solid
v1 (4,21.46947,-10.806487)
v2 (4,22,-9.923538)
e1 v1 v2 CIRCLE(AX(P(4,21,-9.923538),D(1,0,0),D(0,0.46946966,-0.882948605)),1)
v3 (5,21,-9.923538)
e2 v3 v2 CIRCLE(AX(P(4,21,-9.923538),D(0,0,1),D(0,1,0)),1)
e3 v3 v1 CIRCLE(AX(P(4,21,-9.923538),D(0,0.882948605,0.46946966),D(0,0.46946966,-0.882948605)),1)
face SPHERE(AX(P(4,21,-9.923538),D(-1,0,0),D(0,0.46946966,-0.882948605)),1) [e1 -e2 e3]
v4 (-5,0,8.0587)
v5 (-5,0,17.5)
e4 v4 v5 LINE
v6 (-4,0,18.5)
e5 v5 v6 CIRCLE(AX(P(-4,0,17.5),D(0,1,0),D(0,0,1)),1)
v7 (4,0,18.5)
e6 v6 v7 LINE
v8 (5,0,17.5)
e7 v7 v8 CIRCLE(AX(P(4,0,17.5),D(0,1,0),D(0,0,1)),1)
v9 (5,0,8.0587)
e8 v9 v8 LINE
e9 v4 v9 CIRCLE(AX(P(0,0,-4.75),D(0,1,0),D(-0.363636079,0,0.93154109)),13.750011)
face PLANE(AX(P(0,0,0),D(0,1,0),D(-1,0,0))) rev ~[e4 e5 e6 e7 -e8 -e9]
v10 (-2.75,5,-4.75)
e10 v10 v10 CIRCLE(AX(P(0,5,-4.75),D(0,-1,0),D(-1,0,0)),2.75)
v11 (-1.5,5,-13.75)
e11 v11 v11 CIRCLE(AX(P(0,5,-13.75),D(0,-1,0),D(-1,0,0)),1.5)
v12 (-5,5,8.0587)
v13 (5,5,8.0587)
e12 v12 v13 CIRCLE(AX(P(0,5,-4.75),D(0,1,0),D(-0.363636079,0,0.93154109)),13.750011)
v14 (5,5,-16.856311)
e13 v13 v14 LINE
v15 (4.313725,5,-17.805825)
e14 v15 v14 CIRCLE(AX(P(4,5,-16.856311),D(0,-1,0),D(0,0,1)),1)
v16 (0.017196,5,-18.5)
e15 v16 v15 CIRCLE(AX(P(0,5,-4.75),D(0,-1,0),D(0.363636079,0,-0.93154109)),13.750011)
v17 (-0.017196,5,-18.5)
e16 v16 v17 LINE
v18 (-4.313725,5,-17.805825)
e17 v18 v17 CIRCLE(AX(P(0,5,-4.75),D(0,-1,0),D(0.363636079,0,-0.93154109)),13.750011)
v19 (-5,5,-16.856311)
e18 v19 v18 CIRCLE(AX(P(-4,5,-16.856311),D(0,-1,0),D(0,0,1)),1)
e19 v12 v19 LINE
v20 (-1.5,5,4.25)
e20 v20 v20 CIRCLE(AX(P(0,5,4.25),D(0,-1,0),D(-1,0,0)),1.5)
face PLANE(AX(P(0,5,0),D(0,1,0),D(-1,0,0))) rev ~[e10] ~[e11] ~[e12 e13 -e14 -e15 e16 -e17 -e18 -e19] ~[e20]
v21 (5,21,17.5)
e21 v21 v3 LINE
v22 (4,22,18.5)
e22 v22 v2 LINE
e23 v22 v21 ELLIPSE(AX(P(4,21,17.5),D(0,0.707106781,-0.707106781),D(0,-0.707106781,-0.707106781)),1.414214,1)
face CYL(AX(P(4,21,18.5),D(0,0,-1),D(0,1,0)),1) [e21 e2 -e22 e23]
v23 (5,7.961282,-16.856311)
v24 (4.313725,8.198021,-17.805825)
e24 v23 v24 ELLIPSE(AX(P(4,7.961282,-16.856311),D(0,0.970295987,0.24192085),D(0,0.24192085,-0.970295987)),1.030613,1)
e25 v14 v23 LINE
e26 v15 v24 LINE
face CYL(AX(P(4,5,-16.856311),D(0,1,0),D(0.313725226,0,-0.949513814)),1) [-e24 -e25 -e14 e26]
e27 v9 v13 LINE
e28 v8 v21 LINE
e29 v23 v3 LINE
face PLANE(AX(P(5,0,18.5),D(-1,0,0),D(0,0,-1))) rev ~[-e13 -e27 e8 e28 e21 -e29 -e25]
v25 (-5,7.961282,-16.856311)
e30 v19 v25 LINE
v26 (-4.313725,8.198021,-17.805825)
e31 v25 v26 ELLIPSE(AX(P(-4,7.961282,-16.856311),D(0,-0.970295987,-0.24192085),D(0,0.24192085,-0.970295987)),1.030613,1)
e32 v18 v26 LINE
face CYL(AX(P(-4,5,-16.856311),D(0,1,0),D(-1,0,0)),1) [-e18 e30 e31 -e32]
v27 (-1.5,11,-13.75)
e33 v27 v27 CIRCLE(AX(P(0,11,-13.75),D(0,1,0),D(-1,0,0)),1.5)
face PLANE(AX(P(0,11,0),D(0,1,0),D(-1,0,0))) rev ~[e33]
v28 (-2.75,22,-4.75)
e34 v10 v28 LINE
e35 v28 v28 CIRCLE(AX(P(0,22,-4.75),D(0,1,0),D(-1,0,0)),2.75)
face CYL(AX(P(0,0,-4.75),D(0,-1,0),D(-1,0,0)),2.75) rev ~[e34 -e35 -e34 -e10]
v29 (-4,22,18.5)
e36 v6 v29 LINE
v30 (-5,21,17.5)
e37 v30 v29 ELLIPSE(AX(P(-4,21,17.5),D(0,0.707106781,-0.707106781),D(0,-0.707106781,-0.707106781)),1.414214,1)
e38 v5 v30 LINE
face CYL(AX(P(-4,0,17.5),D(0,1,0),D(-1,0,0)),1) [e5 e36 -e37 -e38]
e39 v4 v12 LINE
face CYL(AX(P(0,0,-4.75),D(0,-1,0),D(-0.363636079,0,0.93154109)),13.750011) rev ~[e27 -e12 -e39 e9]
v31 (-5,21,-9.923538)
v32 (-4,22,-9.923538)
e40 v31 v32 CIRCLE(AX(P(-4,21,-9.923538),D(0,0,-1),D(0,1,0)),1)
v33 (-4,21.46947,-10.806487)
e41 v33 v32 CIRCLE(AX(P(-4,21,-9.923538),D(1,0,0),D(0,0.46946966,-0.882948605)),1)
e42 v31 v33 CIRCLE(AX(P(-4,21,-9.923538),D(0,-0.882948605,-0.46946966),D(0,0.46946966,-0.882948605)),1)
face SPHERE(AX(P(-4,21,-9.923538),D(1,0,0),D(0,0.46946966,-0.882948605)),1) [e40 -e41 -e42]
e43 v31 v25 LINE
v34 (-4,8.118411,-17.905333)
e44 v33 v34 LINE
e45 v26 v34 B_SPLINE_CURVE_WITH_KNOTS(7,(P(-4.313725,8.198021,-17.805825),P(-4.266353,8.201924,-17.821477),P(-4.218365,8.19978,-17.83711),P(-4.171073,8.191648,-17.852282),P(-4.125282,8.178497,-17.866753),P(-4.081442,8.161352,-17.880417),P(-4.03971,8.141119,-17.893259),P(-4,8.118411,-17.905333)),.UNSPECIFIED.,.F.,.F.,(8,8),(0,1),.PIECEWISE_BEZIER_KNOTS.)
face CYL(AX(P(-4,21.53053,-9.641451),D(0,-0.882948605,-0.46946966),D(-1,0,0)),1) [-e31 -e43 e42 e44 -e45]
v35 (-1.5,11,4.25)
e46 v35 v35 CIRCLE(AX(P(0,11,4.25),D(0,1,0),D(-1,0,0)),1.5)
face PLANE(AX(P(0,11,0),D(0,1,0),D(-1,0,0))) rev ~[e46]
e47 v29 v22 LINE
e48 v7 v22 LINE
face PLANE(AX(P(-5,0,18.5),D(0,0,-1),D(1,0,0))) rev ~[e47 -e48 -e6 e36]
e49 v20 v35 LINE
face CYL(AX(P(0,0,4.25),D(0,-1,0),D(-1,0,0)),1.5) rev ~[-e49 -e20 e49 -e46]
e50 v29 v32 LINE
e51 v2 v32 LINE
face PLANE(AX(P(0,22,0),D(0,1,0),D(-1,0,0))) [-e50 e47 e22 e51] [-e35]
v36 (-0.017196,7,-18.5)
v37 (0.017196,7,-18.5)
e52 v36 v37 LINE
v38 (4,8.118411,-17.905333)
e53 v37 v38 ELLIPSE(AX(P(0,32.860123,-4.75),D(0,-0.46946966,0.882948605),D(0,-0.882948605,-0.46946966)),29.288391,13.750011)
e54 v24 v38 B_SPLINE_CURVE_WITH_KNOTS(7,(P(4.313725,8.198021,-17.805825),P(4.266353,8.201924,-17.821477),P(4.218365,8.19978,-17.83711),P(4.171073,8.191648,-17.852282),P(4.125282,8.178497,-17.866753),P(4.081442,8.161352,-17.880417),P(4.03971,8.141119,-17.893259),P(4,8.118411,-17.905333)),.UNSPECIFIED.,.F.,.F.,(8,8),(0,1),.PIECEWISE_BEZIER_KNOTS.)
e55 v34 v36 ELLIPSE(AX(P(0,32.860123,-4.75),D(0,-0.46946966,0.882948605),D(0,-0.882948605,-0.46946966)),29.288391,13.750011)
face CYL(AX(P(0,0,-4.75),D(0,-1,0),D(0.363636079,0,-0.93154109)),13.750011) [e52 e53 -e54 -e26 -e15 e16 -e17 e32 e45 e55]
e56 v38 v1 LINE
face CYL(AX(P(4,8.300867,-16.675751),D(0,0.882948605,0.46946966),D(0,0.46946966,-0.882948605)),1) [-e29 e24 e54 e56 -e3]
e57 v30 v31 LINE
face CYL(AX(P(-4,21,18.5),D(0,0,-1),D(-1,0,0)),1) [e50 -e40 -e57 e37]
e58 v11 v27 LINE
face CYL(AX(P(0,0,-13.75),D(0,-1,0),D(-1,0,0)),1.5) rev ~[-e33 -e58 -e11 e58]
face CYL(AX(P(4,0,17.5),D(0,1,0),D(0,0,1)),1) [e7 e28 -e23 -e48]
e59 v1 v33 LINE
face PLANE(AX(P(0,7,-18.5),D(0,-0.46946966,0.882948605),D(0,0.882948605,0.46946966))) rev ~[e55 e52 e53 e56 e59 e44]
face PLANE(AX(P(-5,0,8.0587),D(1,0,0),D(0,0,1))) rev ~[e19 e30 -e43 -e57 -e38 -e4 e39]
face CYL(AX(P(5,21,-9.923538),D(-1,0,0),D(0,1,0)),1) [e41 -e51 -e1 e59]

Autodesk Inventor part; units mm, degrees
ref_plane "YZ Plane" through (0, 0, 0) normal (1, 0, 0) x (0, 1, 0)
ref_plane "XZ Plane" through (0, 0, 0) normal (0, 1, 0) x (-1, 0, 0)
ref_plane "XY Plane" through (0, 0, 0) normal (0, 0, 1) x (1, 0, 0)
sketch "Skizze1" plane through (0, 0, 0) normal (0, 1, 0) x (-1, 0, 0)
  line L0 (5, 18.5) -> (-5, 18.5)
  line L1 (-5, 18.5) -> (-5, -18.5)
  line L2 (-5, -18.5) -> (5, -18.5)
  line L3 (5, -18.5) -> (5, 18.5)
  line L4 (5, 18.5) -> (-5, -18.5) construction
  line L5 (-5, 18.5) -> (5, -18.5) construction
  circle A0 centre (0, -4.75) radius 13.75 construction
  arc A1 (-5, -17.5587) -> (5, -17.5587) centre (0, -4.75) ccw
  arc A2 (5, 8.0587) -> (-5, 8.0587) centre (0, -4.75) ccw
  line L6 (0, -18.5) -> (0, 9) construction
  circle A3 centre (0, -13.75) radius 1.5
  circle A4 centre (0, 4.25) radius 1.5
  line L7 (-5, -4.75) -> (5, -4.75) construction
  circle A5 centre (0, -13.75) radius 4 construction
  circle A6 centre (0, 4.25) radius 4 construction
  circle A7 centre (0, -4.75) radius 2.75
  point P0 (0, 0)
  point P1 (0, 0)
  dimension "d2" = 37
  dimension "d3" = 10
  dimension "d4" = 27.5
  dimension "d18" = 3
  dimension "d20" = 18
  dimension "d23" = 8
  dimension "d24" = 8
  dimension "d25" = 5.5
extrude "Extrusion1" add sketch "Skizze1" along normal blind 22 contours L3 A2 L1 L0 | L3 A1 L1 A2 | A3 | A4
sketch "Skizze2" plane through (0, 0, 0) normal (1, 0, 0) x (0, 1, 0)
  line L0 (0, -18.5) -> (0, -7.5) projected
  line L1 (0, 18.5) -> (22, 18.5) projected
  line L2 (22, -7.5) -> (22, -18.5) projected
  line L3 (7, -18.5) -> (22, -10.5244)
  line L4 (22, -18.5) -> (0, -18.5) projected
  line L5 (22, -10.5244) -> (22, -18.5)
  line L6 (22, -18.5) -> (7, -18.5)
  line L7 (0, -7.5) -> (22, -7.5) projected
  line L8 (22, 18.5) -> (22, -2) projected
  line L9 (22, -2) -> (0, -2) projected
  line L10 (0, -2) -> (0, 18.5) projected
  dimension "d14" = 62
  dimension "d15" = 7
extrude "Extrusion5" cut sketch "Skizze2" along normal through all both and the other way through all contours L3 L2 L4
extrude "Extrusion3" cut sketch "Skizze1" along normal blind 5 contours L3 A1 L1 A2 | L3 L2 A1 | A1 L2 L1 | A3 | A4 | A7
extrude "Extrusion6" cut sketch "Skizze1" along normal blind 11 contours A3 | A4
fillet "Rundung1" radius 1 9 edges at (5, 22, 3.9878) (-5, 22, 3.9878) (0, 22, -10.5244) (5, 15.3852, -14.0415) (5, 6.8852, -17.5587) (-5, 6.8852, -17.5587) (-5, 15.3852, -14.0415) (-5, 11, 18.5) (5, 11, 18.5)
properties part number "Schalter_Knauf"
